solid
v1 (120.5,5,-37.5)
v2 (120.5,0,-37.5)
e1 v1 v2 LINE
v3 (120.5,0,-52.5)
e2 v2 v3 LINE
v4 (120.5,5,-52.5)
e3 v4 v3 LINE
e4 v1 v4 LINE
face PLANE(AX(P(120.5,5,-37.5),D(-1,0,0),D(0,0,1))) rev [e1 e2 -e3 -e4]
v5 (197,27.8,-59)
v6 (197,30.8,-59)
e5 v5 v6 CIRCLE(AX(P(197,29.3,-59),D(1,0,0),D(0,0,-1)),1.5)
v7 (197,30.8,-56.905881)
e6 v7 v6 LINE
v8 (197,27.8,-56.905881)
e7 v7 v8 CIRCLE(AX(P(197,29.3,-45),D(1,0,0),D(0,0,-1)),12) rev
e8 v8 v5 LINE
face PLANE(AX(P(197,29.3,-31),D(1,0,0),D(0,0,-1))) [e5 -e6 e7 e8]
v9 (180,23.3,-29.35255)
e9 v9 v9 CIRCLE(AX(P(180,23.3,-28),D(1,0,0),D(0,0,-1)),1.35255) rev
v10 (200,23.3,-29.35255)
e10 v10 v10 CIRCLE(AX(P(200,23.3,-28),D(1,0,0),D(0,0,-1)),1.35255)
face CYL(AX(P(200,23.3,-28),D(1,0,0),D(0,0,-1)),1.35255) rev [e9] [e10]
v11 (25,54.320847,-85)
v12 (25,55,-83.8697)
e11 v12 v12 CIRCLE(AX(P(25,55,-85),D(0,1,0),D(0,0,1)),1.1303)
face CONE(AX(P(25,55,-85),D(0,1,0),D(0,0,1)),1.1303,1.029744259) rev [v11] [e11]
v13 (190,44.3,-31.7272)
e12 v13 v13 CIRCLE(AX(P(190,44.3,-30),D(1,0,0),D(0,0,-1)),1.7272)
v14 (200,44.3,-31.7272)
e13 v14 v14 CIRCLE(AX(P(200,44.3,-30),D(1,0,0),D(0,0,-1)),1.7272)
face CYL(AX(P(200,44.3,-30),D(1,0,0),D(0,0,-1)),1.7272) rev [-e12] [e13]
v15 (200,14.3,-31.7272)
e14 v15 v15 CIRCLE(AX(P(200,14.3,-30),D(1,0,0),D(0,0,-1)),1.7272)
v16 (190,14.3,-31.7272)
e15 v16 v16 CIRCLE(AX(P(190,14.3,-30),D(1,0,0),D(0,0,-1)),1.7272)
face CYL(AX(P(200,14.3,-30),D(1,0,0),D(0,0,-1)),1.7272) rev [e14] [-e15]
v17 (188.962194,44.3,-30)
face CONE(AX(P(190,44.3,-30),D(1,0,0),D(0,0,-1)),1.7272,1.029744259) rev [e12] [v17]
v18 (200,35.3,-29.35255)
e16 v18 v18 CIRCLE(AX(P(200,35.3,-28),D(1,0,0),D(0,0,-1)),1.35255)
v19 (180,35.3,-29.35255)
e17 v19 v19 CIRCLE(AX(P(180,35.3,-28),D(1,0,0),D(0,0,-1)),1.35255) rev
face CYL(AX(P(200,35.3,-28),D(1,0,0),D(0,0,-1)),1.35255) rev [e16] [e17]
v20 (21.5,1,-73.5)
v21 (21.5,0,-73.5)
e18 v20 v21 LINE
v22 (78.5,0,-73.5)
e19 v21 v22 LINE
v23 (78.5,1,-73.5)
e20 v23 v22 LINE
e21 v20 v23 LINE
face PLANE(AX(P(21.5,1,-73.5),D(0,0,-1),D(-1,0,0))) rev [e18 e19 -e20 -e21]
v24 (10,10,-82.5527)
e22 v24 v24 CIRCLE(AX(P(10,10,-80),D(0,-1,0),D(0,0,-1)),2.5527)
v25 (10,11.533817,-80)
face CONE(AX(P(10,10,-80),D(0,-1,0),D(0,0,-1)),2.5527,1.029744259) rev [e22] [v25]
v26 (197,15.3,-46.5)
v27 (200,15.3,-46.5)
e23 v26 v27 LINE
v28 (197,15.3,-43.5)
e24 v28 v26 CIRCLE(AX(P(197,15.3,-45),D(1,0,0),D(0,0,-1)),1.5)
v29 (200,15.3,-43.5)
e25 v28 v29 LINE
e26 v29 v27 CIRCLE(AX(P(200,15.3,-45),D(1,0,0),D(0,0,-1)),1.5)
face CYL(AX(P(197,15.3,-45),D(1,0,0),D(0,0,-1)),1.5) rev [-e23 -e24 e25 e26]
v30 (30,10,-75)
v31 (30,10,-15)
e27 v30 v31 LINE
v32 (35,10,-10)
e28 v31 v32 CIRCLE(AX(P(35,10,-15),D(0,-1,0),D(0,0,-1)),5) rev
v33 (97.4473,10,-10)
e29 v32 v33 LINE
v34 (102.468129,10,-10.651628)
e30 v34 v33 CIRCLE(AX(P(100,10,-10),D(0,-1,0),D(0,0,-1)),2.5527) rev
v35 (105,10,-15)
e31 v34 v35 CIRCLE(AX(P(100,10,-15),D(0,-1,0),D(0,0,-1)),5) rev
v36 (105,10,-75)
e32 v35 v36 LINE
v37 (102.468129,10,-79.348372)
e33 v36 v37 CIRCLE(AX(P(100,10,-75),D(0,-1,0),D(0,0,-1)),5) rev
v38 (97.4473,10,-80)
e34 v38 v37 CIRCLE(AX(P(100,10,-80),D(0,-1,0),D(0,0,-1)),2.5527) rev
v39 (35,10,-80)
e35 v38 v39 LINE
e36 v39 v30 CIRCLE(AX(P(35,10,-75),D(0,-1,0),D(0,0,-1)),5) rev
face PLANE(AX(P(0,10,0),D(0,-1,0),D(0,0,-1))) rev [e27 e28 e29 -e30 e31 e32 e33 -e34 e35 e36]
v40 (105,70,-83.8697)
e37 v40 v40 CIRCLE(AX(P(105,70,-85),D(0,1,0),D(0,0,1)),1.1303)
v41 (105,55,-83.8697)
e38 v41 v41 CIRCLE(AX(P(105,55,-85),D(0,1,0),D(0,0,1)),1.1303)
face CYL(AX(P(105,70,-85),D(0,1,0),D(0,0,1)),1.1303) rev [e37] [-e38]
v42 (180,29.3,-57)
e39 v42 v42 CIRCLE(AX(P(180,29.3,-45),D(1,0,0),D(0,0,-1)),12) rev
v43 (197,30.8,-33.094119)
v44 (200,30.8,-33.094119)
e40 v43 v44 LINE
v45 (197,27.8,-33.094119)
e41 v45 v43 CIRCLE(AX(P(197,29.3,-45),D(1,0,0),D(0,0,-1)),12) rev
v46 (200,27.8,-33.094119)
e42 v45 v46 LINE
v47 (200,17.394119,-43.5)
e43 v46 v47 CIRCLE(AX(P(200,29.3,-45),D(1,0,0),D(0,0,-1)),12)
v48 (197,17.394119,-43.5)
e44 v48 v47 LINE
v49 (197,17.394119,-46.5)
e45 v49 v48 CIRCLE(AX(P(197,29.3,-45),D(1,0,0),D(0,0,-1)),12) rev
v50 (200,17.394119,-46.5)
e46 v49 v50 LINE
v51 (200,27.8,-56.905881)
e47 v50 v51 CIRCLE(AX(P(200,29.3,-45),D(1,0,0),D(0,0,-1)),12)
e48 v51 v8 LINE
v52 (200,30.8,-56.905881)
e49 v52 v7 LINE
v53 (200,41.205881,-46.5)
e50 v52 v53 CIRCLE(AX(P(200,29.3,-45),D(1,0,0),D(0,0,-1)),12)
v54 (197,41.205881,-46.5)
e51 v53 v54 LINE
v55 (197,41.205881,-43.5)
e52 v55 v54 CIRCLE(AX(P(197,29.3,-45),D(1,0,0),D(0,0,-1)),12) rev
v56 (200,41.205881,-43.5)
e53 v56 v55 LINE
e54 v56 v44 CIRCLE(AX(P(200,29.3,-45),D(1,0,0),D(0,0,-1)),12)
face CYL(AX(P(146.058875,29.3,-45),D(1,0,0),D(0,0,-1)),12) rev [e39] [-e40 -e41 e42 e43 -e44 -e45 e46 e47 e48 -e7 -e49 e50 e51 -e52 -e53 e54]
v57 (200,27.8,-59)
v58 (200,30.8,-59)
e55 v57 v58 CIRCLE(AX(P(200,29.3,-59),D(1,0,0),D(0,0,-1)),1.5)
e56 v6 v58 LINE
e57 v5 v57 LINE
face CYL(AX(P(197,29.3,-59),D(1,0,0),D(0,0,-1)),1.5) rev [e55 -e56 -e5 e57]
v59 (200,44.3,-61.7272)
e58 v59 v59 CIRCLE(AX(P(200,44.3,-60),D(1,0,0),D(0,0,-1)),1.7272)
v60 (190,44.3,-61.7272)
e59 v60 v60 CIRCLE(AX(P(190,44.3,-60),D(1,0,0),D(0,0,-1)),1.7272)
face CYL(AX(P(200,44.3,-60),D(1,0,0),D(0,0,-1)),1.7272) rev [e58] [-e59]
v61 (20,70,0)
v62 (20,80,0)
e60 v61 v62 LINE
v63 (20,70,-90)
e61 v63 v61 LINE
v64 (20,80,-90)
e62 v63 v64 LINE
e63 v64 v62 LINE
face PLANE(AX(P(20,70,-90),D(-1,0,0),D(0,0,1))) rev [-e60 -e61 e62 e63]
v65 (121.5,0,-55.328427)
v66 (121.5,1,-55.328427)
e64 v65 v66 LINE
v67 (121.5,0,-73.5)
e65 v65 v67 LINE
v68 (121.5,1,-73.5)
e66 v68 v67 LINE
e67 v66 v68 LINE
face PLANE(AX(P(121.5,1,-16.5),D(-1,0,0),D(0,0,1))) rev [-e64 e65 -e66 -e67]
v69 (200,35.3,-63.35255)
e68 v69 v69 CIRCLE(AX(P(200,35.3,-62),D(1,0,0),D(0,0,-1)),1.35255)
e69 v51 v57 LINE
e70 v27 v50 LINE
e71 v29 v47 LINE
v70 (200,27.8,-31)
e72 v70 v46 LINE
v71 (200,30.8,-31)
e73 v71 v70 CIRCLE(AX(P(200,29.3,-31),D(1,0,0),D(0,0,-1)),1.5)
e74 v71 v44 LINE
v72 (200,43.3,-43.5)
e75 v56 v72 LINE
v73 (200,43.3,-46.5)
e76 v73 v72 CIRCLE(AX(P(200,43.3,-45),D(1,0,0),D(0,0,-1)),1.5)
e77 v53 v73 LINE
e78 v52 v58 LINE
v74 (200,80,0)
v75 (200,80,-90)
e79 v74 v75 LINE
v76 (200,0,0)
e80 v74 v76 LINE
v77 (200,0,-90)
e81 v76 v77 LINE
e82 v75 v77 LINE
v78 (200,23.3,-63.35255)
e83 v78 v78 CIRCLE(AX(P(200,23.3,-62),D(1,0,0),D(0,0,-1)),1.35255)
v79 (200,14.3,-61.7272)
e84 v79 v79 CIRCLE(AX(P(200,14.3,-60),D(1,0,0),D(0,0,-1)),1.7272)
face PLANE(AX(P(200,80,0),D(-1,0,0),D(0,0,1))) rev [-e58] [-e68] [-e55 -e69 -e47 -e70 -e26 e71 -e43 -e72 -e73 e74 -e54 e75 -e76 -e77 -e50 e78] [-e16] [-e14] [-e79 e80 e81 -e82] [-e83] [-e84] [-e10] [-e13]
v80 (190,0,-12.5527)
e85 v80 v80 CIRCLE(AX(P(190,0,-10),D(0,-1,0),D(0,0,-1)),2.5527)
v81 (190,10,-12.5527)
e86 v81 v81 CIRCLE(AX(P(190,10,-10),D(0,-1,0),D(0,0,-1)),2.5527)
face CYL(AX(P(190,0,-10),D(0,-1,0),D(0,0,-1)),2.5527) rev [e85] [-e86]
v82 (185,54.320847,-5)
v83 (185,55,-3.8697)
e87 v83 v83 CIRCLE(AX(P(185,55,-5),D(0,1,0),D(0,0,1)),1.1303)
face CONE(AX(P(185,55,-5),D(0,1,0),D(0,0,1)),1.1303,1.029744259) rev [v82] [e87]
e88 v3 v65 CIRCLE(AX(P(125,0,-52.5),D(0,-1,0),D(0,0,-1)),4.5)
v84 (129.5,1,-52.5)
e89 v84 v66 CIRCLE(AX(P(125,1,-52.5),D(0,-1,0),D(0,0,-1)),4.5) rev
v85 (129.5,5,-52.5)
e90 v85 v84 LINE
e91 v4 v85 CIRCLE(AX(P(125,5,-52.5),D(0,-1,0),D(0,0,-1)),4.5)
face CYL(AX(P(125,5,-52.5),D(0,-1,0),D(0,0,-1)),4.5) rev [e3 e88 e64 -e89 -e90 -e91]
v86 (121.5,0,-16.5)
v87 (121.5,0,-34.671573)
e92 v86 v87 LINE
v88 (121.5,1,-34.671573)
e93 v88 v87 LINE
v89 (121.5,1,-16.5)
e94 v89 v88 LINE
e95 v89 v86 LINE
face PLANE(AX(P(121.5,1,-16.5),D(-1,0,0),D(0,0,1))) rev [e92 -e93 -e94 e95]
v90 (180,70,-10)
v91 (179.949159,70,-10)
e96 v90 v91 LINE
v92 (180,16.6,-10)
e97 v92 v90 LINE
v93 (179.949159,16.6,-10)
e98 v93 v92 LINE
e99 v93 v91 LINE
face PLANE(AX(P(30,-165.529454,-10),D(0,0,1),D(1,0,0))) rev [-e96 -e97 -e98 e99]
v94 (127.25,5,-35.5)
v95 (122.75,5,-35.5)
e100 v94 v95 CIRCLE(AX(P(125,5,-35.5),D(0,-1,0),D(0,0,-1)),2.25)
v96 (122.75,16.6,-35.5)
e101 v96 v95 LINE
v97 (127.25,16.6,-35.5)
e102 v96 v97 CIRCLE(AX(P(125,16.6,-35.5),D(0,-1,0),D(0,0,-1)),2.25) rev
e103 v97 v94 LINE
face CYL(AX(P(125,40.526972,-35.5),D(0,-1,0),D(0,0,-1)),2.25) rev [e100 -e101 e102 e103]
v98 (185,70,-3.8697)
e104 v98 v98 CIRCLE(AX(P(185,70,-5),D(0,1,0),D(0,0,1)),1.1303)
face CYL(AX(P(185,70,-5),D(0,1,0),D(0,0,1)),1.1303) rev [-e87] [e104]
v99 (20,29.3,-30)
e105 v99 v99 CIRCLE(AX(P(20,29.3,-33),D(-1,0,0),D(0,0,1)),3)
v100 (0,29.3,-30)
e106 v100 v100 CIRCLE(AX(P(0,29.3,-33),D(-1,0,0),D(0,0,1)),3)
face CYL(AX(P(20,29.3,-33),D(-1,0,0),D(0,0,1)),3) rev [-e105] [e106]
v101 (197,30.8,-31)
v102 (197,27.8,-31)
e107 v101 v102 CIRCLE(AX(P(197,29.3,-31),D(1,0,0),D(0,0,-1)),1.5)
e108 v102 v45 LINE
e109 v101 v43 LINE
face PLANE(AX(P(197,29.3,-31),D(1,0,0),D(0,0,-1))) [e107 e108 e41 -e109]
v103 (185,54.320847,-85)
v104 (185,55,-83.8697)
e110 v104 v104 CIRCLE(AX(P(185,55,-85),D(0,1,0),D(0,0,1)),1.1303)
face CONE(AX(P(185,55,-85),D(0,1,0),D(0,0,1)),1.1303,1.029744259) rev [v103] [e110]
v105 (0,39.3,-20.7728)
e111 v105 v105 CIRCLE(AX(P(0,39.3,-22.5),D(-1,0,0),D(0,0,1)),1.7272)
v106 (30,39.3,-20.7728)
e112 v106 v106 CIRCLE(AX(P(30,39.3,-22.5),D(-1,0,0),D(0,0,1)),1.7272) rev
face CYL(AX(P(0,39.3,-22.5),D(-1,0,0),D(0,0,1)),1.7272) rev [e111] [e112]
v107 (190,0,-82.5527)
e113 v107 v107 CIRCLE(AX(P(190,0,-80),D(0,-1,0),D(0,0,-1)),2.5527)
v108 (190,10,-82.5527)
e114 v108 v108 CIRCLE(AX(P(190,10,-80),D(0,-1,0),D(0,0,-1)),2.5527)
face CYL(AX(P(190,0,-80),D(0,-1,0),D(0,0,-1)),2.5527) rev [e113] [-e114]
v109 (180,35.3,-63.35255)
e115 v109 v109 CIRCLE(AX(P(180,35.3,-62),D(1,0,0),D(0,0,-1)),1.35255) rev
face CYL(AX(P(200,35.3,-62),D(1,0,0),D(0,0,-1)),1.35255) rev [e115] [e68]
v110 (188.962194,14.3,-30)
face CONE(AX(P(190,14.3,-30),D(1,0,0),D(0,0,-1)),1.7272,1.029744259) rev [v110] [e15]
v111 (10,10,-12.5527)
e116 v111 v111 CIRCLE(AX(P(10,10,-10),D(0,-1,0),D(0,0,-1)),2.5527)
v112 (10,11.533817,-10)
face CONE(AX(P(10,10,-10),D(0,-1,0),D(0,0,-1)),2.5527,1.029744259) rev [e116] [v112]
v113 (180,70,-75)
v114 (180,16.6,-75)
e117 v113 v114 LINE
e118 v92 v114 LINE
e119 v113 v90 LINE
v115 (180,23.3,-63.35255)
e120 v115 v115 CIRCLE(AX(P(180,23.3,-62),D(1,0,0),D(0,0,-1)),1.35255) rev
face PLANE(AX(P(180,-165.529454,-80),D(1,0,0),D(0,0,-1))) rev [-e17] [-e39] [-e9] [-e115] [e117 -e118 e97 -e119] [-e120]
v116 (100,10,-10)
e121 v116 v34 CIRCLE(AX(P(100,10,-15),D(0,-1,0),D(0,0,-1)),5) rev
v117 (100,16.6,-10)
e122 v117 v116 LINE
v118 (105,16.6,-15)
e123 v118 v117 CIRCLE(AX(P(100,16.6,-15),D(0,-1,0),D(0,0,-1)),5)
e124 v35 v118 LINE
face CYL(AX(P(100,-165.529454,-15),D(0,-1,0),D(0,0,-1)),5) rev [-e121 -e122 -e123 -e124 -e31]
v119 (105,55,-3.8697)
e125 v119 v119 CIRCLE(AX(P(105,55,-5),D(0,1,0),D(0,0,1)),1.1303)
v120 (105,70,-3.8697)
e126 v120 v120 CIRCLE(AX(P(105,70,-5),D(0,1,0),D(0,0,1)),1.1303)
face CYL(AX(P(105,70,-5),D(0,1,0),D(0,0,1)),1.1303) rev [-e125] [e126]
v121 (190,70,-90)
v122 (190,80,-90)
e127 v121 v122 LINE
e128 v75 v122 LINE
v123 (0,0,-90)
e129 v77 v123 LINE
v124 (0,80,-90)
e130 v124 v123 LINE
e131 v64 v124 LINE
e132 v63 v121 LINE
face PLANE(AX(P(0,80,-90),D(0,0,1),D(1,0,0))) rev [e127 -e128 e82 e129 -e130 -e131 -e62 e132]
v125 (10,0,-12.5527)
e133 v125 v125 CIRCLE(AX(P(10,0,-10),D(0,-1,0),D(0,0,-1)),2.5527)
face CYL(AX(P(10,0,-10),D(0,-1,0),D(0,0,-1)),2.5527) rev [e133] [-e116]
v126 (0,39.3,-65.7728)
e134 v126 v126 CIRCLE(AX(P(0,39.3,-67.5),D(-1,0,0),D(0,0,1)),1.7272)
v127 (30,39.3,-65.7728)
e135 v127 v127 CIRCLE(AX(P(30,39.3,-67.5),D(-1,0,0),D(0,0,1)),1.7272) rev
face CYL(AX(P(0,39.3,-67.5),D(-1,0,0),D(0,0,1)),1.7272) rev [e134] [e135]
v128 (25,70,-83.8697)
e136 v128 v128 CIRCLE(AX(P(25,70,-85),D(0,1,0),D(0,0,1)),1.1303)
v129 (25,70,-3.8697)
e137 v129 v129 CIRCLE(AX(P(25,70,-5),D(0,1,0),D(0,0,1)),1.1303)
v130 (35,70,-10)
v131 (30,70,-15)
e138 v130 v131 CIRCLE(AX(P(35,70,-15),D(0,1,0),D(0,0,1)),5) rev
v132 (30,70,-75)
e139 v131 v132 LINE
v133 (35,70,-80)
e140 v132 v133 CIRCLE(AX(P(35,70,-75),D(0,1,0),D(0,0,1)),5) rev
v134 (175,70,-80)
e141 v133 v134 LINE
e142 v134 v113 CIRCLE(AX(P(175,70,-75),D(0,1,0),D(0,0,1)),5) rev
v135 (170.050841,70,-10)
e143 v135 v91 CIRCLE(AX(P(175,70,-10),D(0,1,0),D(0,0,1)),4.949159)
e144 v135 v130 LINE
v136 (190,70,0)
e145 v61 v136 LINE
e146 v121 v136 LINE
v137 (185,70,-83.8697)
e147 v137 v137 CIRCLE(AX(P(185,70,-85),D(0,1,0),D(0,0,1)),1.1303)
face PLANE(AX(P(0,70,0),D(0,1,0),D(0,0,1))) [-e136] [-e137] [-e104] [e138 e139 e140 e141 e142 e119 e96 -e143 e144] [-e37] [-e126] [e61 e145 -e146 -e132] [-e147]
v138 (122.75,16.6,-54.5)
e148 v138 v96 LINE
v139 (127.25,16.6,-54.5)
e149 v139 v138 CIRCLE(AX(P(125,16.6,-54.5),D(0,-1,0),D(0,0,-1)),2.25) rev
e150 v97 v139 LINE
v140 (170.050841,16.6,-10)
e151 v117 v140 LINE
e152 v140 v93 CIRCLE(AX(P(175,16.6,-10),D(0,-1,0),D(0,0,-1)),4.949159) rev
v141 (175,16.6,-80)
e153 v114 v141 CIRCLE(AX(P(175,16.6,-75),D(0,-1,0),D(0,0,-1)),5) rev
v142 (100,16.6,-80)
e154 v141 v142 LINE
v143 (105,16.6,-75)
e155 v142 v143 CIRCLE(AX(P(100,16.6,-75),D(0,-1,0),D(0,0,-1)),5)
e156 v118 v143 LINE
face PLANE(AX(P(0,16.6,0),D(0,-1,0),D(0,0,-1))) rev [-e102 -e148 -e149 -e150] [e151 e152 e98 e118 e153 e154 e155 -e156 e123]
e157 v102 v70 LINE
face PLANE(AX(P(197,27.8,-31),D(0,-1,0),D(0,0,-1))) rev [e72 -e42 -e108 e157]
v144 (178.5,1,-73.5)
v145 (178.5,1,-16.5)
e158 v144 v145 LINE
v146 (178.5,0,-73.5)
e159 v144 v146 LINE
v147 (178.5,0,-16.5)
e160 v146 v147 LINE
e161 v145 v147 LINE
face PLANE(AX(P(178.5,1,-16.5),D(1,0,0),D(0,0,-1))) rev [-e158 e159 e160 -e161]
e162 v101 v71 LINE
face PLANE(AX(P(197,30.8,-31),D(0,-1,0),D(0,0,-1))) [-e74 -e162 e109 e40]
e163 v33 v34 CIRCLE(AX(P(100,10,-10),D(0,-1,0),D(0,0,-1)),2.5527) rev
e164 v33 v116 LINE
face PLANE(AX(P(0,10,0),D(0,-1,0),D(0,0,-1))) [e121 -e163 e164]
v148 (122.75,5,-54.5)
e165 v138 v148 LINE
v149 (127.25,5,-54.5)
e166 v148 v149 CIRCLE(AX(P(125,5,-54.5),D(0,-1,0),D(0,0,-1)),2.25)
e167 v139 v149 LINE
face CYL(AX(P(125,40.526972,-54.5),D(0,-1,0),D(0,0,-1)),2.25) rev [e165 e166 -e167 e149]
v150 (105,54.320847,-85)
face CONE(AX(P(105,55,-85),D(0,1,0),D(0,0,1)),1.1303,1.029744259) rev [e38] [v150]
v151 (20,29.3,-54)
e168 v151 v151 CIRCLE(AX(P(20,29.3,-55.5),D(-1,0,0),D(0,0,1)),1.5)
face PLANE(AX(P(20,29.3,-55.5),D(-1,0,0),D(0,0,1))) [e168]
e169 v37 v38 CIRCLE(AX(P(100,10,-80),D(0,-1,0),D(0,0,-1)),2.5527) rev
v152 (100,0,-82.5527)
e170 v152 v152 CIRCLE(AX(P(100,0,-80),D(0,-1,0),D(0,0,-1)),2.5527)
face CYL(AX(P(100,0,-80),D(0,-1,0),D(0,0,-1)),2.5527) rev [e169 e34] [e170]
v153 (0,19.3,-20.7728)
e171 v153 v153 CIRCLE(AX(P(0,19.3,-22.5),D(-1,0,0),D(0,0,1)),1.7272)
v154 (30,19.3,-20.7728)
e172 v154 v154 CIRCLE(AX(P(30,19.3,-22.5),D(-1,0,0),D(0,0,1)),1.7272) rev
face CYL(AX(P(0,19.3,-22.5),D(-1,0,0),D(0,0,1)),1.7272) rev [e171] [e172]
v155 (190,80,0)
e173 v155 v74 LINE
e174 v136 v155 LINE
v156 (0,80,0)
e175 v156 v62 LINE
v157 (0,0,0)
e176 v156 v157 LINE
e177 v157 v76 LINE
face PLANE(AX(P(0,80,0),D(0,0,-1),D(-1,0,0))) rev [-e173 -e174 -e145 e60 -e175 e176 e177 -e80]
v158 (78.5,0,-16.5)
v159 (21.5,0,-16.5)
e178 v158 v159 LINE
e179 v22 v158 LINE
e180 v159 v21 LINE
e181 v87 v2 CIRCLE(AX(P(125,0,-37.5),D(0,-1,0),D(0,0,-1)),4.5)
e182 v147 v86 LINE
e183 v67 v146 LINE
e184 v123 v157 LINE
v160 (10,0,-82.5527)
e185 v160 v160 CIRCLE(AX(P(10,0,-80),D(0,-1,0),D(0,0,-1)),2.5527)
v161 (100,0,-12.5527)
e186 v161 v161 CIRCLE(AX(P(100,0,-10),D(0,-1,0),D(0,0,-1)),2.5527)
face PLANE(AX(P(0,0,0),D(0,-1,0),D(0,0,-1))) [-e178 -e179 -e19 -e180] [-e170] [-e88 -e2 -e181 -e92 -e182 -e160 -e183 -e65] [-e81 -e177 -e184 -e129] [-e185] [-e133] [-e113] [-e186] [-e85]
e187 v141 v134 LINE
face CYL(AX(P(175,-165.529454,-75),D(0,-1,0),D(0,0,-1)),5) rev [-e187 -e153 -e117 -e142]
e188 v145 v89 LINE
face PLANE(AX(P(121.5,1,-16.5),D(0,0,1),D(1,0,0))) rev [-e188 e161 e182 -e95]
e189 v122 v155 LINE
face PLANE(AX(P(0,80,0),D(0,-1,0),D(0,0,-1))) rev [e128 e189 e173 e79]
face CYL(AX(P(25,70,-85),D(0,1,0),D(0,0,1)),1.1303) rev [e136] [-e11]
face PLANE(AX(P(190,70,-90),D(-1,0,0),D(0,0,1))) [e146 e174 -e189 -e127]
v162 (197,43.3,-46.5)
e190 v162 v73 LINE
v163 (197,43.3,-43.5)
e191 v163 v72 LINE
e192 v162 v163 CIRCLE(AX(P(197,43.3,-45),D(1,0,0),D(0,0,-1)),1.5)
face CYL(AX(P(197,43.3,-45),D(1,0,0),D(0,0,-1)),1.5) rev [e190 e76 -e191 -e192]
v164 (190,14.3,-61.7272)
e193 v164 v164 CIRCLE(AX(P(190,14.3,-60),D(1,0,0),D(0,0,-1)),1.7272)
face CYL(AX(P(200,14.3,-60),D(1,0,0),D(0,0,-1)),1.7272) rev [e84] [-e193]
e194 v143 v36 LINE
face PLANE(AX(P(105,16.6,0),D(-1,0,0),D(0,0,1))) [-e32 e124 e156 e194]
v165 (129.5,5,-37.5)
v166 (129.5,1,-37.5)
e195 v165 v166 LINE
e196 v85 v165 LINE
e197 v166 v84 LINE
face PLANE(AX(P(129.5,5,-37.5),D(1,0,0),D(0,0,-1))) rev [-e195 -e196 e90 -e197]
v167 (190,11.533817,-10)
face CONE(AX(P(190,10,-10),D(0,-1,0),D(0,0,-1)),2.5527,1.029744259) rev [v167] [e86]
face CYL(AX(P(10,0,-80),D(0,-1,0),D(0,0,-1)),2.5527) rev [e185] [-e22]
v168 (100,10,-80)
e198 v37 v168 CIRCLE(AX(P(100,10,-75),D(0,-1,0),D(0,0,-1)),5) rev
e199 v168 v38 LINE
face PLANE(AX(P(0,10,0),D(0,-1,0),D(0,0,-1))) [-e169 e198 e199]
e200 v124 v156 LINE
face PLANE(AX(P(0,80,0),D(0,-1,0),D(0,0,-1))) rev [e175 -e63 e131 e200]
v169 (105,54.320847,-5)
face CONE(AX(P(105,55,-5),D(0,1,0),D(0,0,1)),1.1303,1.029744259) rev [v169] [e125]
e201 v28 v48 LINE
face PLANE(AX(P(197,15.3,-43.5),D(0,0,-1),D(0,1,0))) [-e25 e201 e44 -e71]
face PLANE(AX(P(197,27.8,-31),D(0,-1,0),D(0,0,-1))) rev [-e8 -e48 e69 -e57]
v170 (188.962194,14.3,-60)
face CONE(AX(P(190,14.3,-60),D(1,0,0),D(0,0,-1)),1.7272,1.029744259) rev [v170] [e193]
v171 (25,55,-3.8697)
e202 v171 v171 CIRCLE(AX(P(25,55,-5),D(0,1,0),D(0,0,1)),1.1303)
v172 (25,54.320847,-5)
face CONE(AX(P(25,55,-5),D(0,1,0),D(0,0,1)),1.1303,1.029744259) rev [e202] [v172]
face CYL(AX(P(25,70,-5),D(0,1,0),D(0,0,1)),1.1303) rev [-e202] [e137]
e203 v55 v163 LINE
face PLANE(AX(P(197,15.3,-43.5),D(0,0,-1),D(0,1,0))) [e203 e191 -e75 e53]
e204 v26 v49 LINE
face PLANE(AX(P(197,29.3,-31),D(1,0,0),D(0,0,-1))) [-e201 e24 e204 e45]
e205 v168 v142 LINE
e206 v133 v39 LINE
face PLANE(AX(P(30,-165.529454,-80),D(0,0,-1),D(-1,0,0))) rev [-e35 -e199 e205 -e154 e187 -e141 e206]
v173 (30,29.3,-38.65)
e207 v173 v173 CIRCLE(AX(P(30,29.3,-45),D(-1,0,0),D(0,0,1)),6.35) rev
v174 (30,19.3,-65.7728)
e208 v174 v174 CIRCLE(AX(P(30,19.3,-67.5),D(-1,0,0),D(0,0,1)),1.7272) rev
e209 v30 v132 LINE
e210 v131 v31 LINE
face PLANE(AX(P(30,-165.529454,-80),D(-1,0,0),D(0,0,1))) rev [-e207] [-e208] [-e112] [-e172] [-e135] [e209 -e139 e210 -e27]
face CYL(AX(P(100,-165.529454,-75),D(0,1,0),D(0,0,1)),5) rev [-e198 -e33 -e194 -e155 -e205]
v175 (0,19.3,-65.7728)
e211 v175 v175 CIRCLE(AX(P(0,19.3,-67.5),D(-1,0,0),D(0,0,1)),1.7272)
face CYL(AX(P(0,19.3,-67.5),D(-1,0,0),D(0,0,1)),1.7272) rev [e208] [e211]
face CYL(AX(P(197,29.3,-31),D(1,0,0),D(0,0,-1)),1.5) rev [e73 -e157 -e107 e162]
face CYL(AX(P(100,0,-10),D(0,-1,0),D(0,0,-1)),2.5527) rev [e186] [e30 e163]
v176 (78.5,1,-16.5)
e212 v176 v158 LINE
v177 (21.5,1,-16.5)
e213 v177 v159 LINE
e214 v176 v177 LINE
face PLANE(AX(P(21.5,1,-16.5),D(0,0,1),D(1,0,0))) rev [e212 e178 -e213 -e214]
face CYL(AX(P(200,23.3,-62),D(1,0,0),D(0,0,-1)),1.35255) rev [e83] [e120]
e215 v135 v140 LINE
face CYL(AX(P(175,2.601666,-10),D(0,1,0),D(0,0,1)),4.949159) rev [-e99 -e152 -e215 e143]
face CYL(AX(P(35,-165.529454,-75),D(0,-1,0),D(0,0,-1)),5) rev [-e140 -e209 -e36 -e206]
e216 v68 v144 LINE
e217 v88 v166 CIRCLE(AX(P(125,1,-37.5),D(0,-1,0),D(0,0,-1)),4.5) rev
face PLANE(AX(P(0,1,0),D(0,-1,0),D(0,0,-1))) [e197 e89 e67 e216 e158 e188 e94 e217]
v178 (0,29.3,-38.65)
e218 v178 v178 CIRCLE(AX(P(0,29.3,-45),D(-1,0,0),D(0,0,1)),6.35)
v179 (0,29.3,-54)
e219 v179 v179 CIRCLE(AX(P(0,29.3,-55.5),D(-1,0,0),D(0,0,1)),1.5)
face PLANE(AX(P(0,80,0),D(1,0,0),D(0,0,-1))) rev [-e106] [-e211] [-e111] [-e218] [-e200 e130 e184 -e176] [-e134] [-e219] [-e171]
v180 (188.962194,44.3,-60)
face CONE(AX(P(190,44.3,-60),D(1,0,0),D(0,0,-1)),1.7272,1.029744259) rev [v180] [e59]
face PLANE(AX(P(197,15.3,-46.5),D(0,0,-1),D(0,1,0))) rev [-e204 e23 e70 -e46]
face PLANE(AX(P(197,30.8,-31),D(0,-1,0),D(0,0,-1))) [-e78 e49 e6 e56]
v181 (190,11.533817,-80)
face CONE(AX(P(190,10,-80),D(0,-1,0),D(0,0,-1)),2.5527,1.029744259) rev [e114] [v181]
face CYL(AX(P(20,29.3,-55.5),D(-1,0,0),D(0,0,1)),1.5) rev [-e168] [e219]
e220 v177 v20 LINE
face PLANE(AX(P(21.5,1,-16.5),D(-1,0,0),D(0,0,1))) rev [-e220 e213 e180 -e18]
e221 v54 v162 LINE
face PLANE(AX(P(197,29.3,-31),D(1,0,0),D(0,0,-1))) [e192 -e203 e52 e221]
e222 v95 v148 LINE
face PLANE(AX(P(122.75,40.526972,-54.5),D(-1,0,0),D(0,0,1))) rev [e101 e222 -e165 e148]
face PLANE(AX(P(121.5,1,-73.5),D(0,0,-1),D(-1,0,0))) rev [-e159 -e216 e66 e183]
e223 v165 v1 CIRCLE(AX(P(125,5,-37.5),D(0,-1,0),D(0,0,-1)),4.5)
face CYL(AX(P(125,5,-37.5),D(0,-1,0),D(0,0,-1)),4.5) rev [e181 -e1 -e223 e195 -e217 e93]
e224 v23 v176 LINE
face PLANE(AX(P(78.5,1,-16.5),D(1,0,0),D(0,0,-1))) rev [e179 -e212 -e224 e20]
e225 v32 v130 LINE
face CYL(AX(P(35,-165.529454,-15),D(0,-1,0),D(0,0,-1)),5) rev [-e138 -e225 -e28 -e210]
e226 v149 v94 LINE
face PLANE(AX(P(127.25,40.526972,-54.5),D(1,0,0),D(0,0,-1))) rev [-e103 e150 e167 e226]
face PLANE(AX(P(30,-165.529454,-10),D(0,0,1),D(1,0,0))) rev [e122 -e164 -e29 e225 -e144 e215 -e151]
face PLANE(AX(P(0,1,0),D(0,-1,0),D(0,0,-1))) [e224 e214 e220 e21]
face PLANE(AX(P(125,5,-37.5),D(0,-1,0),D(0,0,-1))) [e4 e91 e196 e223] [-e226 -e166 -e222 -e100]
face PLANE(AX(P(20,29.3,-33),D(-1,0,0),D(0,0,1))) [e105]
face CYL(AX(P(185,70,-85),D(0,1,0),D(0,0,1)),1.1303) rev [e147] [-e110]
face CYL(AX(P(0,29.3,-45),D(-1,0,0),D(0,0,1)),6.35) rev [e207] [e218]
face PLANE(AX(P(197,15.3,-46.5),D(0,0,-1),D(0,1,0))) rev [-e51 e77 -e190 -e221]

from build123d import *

# Parameters (mm, degrees)
SKETCH5_W                                      = 200
SKETCH5_H                                      = 90
BOSS_EXTRUDE1_DEPTH                            = 80
SKETCH6_W                                      = 150
SKETCH6_H                                      = 70
CAVITYBED_DEPTH                                = 70
DIODEHOLDER_SM05_TAPPED_HOLE1_REACH            = 235.452
DIODEHOLDER_SM05_TAPPED_HOLE1_BORE_R           = 6.35
FILLET1_R                                      = 5
SKETCH33_W                                     = 170
SKETCH33_H                                     = 90
LIDGROOVE_DEPTH                                = 10
SKETCH35_W                                     = 85
SKETCH35_H                                     = 90
FILTERPLATFORM_DEPTH                           = 16.6
FILLET3_R                                      = 5
FILTERMOUNTGROOVE_DEPTH                        = 5
FILTERMOUNTCUT_DEPTH                           = 11.6
SKETCH42_R                                     = 12
OUTPUTHOLE_DEPTH                               = 20
SKETCH54_R                                     = 3
SKETCH54_R_2                                   = 1.5
THERMISTER_AD590_DIODE_DEPTH                   = 20
SKETCH61_W                                     = 57
SKETCH61_H                                     = 57
TEC_GROOVES_DEPTH                              = 1
LENSPLATEMOUNTINGHOLES_8_32_TAPPED_HOLE1_REACH = 235.452
LENSPLATEMOUNTINGHOLES_8_32_TAPPED_H_2_R       = 1.7272
PIEZOPLATE_MOUNTING_HOLES_6_32_TAPPED_HO_REACH = 235.452
PIEZOPLATE_MOUNTING_HOLES_6_32_TAPPE_2_R       = 1.35255
LENSPLATEOUTPUTMOUNTING_4_40_TAPPED_HOLE_D     = 3.4544
LENSPLATEOUTPUTMOUNTING_4_40_TAPPED_HOLE_DEPTH = 10
LENSPLATEOUTPUTMOUNTING_4_40_TAPPED_HOLE_TIP   = 1.037806461
COVERLIDTHREADS_D                              = 2.2606
COVERLIDTHREADS_DEPTH                          = 15
COVERLIDTHREADS_TIP                            = 0.679152758
BOTTOMMOUNTING_1_4_20_TAPPED_HOLE2_OUTLI_R     = 2.5527
BOTTOMMOUNTING_1_4_20_TAPPED_HOLE2_DEPTH       = 10
SKETCH67_R                                     = 4.949158555
CUT_EXTRUDE1_DEPTH                             = 53.4
CUT_EXTRUDE2_DEPTH                             = 3


# Read off the part's stored shape, not the designer's step: BottomMounting_1/4-20 Tapped Hole2
with BuildPart() as part:
    # Sketch5 → Boss-Extrude1 (new body)
    with BuildSketch(Plane(origin=(0, 0, 0), x_dir=(1, 0, 0), z_dir=(0, 1, 0))):
        with Locations((100, 45)):
            Rectangle(SKETCH5_W, SKETCH5_H)
    extrude(amount=BOSS_EXTRUDE1_DEPTH)

    # Sketch6 → CavityBed (cut)
    with BuildSketch(Plane(origin=(0, 80, 0), x_dir=(1, 0, 0), z_dir=(0, 1, 0))):
        with Locations((105, 45)):
            Rectangle(SKETCH6_W, SKETCH6_H)
    extrude(amount=-CAVITYBED_DEPTH, mode=Mode.SUBTRACT)

    # DiodeHolder_SM05_Tapped Hole1 bore → DiodeHolder_SM05_Tapped Hole1 (cut, up to next)
    with BuildSketch(Plane.ZY, mode=Mode.PRIVATE) as diodeholder_sm05_tapped_hole1_sk1:
        with Locations((-45, 29.3)):
            Circle(DIODEHOLDER_SM05_TAPPED_HOLE1_BORE_R)
    diodeholder_sm05_tapped_hole1_tool1 = extrude(diodeholder_sm05_tapped_hole1_sk1.sketch, amount=-DIODEHOLDER_SM05_TAPPED_HOLE1_REACH, mode=Mode.PRIVATE) & part.part
    add(diodeholder_sm05_tapped_hole1_tool1.solids().sort_by_distance((0, 29.3, -45))[0], mode=Mode.SUBTRACT)

    # Fillet1
    fillet1_edges = [part.edges().sort_by_distance(p)[0] for p in [
        (180, 45, -80),
        (30, 45, -80),
        (30, 45, -10),
    ]]
    fillet(fillet1_edges, radius=FILLET1_R)

    # Sketch33 → LidGroove (cut)
    with BuildSketch(Plane(origin=(0, 80, 0), x_dir=(1, 0, 0), z_dir=(0, 1, 0))):
        with Locations((105, 45)):
            Rectangle(SKETCH33_W, SKETCH33_H)
    extrude(amount=-LIDGROOVE_DEPTH, mode=Mode.SUBTRACT)

    # Sketch35 → FilterPlatform (add)
    with BuildSketch(Plane.XZ):
        with Locations((147.5, -45)):
            Rectangle(SKETCH35_W, SKETCH35_H)
    extrude(amount=-FILTERPLATFORM_DEPTH)

    # Fillet3
    fillet3_edges = [part.edges().sort_by_distance(p)[0] for p in [
        (105, 13.3, -10),
        (105, 13.3, -80),
    ]]
    fillet(fillet3_edges, radius=FILLET3_R)

    # Sketch36 → FilterMountGroove (cut)
    with BuildSketch(Plane.XZ):
        with BuildLine():
            Line((129.5, -37.5), (129.5, -52.5))
            ThreePointArc((129.5, -52.5), (125, -57), (120.5, -52.5))
            Line((120.5, -52.5), (120.5, -37.5))
            ThreePointArc((120.5, -37.5), (125, -33), (129.5, -37.5))
        make_face()
    extrude(amount=-FILTERMOUNTGROOVE_DEPTH, mode=Mode.SUBTRACT)

    # Sketch60 → FilterMountCut (cut)
    with BuildSketch(Plane.XZ.offset(-5)):
        with BuildLine():
            Line((122.75, -54.5), (122.75, -35.5))
            ThreePointArc((122.75, -35.5), (125, -33.25), (127.25, -35.5))
            Line((127.25, -35.5), (127.25, -54.5))
            ThreePointArc((127.25, -54.5), (125, -56.75), (122.75, -54.5))
        make_face()
    extrude(amount=-FILTERMOUNTCUT_DEPTH, mode=Mode.SUBTRACT)

    # Sketch42 → OutputHole (cut)
    with BuildSketch(Plane(origin=(200, 0, 0), x_dir=(0, 0, -1), z_dir=(1, 0, 0))):
        with Locations((45, 29.3)):
            Circle(SKETCH42_R)
    extrude(amount=-OUTPUTHOLE_DEPTH, mode=Mode.SUBTRACT)

    # Sketch54 → thermister_AD590_diode (cut)
    with BuildSketch(Plane.ZY):
        with Locations((-33, 29.3)):
            Circle(SKETCH54_R)
        with Locations((-55.5, 29.3)):
            Circle(SKETCH54_R_2)
    extrude(amount=-THERMISTER_AD590_DIODE_DEPTH, mode=Mode.SUBTRACT)

    # Sketch61 → TEC_grooves (cut)
    with BuildSketch(Plane.XZ):
        with Locations((50, -45)):
            Rectangle(SKETCH61_W, SKETCH61_H)
        with Locations((150, -45)):
            Rectangle(SKETCH61_W, SKETCH61_H)
    extrude(amount=-TEC_GROOVES_DEPTH, mode=Mode.SUBTRACT)

    # LensPlateMountingHoles_8-32 Tapped H 2 → LensPlateMountingHoles#8-32 Tapped Hole1 (cut, up to next)
    with BuildSketch(Plane.ZY, mode=Mode.PRIVATE) as lensplatemountingholes_8_32_tapped_hole1_sk1:
        with Locations((-67.5, 39.3)):
            Circle(LENSPLATEMOUNTINGHOLES_8_32_TAPPED_H_2_R)
    lensplatemountingholes_8_32_tapped_hole1_tool1 = extrude(lensplatemountingholes_8_32_tapped_hole1_sk1.sketch, amount=-LENSPLATEMOUNTINGHOLES_8_32_TAPPED_HOLE1_REACH, mode=Mode.PRIVATE) & part.part
    # LensPlateMountingHoles_8-32 Tapped H 2 → LensPlateMountingHoles#8-32 Tapped Hole1 (cut, up to next)
    with BuildSketch(Plane.ZY, mode=Mode.PRIVATE) as lensplatemountingholes_8_32_tapped_hole1_sk2:
        with Locations((-22.5, 39.3)):
            Circle(LENSPLATEMOUNTINGHOLES_8_32_TAPPED_H_2_R)
    lensplatemountingholes_8_32_tapped_hole1_tool2 = extrude(lensplatemountingholes_8_32_tapped_hole1_sk2.sketch, amount=-LENSPLATEMOUNTINGHOLES_8_32_TAPPED_HOLE1_REACH, mode=Mode.PRIVATE) & part.part
    # LensPlateMountingHoles_8-32 Tapped H 2 → LensPlateMountingHoles#8-32 Tapped Hole1 (cut, up to next)
    with BuildSketch(Plane.ZY, mode=Mode.PRIVATE) as lensplatemountingholes_8_32_tapped_hole1_sk3:
        with Locations((-22.5, 19.3)):
            Circle(LENSPLATEMOUNTINGHOLES_8_32_TAPPED_H_2_R)
    lensplatemountingholes_8_32_tapped_hole1_tool3 = extrude(lensplatemountingholes_8_32_tapped_hole1_sk3.sketch, amount=-LENSPLATEMOUNTINGHOLES_8_32_TAPPED_HOLE1_REACH, mode=Mode.PRIVATE) & part.part
    # LensPlateMountingHoles_8-32 Tapped H 2 → LensPlateMountingHoles#8-32 Tapped Hole1 (cut, up to next)
    with BuildSketch(Plane.ZY, mode=Mode.PRIVATE) as lensplatemountingholes_8_32_tapped_hole1_sk4:
        with Locations((-67.5, 19.3)):
            Circle(LENSPLATEMOUNTINGHOLES_8_32_TAPPED_H_2_R)
    lensplatemountingholes_8_32_tapped_hole1_tool4 = extrude(lensplatemountingholes_8_32_tapped_hole1_sk4.sketch, amount=-LENSPLATEMOUNTINGHOLES_8_32_TAPPED_HOLE1_REACH, mode=Mode.PRIVATE) & part.part
    add(lensplatemountingholes_8_32_tapped_hole1_tool1.solids().sort_by_distance((0, 39.3, -67.5))[0], mode=Mode.SUBTRACT)
    add(lensplatemountingholes_8_32_tapped_hole1_tool2.solids().sort_by_distance((0, 39.3, -22.5))[0], mode=Mode.SUBTRACT)
    add(lensplatemountingholes_8_32_tapped_hole1_tool3.solids().sort_by_distance((0, 19.3, -22.5))[0], mode=Mode.SUBTRACT)
    add(lensplatemountingholes_8_32_tapped_hole1_tool4.solids().sort_by_distance((0, 19.3, -67.5))[0], mode=Mode.SUBTRACT)

    # PiezoPlate_Mounting_holes_6-32 Tappe 2 → PiezoPlate_Mounting_holes#6-32 Tapped Hole2 (cut, up to next)
    with BuildSketch(Plane(origin=(200, 0, 0), x_dir=(0, 0, -1), z_dir=(1, 0, 0)), mode=Mode.PRIVATE) as piezoplate_mounting_holes_6_32_tapped_ho_sk1:
        with Locations((28, 35.3)):
            Circle(PIEZOPLATE_MOUNTING_HOLES_6_32_TAPPE_2_R)
    piezoplate_mounting_holes_6_32_tapped_ho_tool1 = extrude(piezoplate_mounting_holes_6_32_tapped_ho_sk1.sketch, amount=-PIEZOPLATE_MOUNTING_HOLES_6_32_TAPPED_HO_REACH, mode=Mode.PRIVATE) & part.part
    # PiezoPlate_Mounting_holes_6-32 Tappe 2 → PiezoPlate_Mounting_holes#6-32 Tapped Hole2 (cut, up to next)
    with BuildSketch(Plane(origin=(200, 0, 0), x_dir=(0, 0, -1), z_dir=(1, 0, 0)), mode=Mode.PRIVATE) as piezoplate_mounting_holes_6_32_tapped_ho_sk2:
        with Locations((62, 35.3)):
            Circle(PIEZOPLATE_MOUNTING_HOLES_6_32_TAPPE_2_R)
    piezoplate_mounting_holes_6_32_tapped_ho_tool2 = extrude(piezoplate_mounting_holes_6_32_tapped_ho_sk2.sketch, amount=-PIEZOPLATE_MOUNTING_HOLES_6_32_TAPPED_HO_REACH, mode=Mode.PRIVATE) & part.part
    # PiezoPlate_Mounting_holes_6-32 Tappe 2 → PiezoPlate_Mounting_holes#6-32 Tapped Hole2 (cut, up to next)
    with BuildSketch(Plane(origin=(200, 0, 0), x_dir=(0, 0, -1), z_dir=(1, 0, 0)), mode=Mode.PRIVATE) as piezoplate_mounting_holes_6_32_tapped_ho_sk3:
        with Locations((62, 23.3)):
            Circle(PIEZOPLATE_MOUNTING_HOLES_6_32_TAPPE_2_R)
    piezoplate_mounting_holes_6_32_tapped_ho_tool3 = extrude(piezoplate_mounting_holes_6_32_tapped_ho_sk3.sketch, amount=-PIEZOPLATE_MOUNTING_HOLES_6_32_TAPPED_HO_REACH, mode=Mode.PRIVATE) & part.part
    # PiezoPlate_Mounting_holes_6-32 Tappe 2 → PiezoPlate_Mounting_holes#6-32 Tapped Hole2 (cut, up to next)
    with BuildSketch(Plane(origin=(200, 0, 0), x_dir=(0, 0, -1), z_dir=(1, 0, 0)), mode=Mode.PRIVATE) as piezoplate_mounting_holes_6_32_tapped_ho_sk4:
        with Locations((28, 23.3)):
            Circle(PIEZOPLATE_MOUNTING_HOLES_6_32_TAPPE_2_R)
    piezoplate_mounting_holes_6_32_tapped_ho_tool4 = extrude(piezoplate_mounting_holes_6_32_tapped_ho_sk4.sketch, amount=-PIEZOPLATE_MOUNTING_HOLES_6_32_TAPPED_HO_REACH, mode=Mode.PRIVATE) & part.part
    add(piezoplate_mounting_holes_6_32_tapped_ho_tool1.solids().sort_by_distance((200, 35.3, -28))[0], mode=Mode.SUBTRACT)
    add(piezoplate_mounting_holes_6_32_tapped_ho_tool2.solids().sort_by_distance((200, 35.3, -62))[0], mode=Mode.SUBTRACT)
    add(piezoplate_mounting_holes_6_32_tapped_ho_tool3.solids().sort_by_distance((200, 23.3, -62))[0], mode=Mode.SUBTRACT)
    add(piezoplate_mounting_holes_6_32_tapped_ho_tool4.solids().sort_by_distance((200, 23.3, -28))[0], mode=Mode.SUBTRACT)

    # LensPlateOutputMounting#4-40 Tapped Hole3
    with Locations(Plane(origin=(200, 0, 0), x_dir=(0, 0, -1), z_dir=(1, 0, 0))):
        with Locations((30, 44.3), (60, 44.3), (60, 14.3), (30, 14.3)):
            Hole(LENSPLATEOUTPUTMOUNTING_4_40_TAPPED_HOLE_D / 2, depth=LENSPLATEOUTPUTMOUNTING_4_40_TAPPED_HOLE_DEPTH)
            with Locations((0, 0, -(LENSPLATEOUTPUTMOUNTING_4_40_TAPPED_HOLE_DEPTH + LENSPLATEOUTPUTMOUNTING_4_40_TAPPED_HOLE_TIP / 2))):  # 118° drill point
                Cone(0, LENSPLATEOUTPUTMOUNTING_4_40_TAPPED_HOLE_D / 2, LENSPLATEOUTPUTMOUNTING_4_40_TAPPED_HOLE_TIP, mode=Mode.SUBTRACT)

    # CoverLidThreads
    with Locations(Plane(origin=(0, 70, 0), x_dir=(1, 0, 0), z_dir=(0, 1, 0))):
        with Locations((25, 85), (185, 85), (185, 5), (25, 5), (105, 5), (105, 85)):
            Hole(COVERLIDTHREADS_D / 2, depth=COVERLIDTHREADS_DEPTH)
            with Locations((0, 0, -(COVERLIDTHREADS_DEPTH + COVERLIDTHREADS_TIP / 2))):  # 118° drill point
                Cone(0, COVERLIDTHREADS_D / 2, COVERLIDTHREADS_TIP, mode=Mode.SUBTRACT)

    # BottomMounting_1/4-20 Tapped Hole2 outli → BottomMounting_1/4-20 Tapped Hole2 (cut)
    with BuildSketch(Plane(origin=(0, 0, 0), x_dir=(1, 0, 0), z_dir=(0, 1, 0))):
        with Locations((100, 80)):
            Circle(BOTTOMMOUNTING_1_4_20_TAPPED_HOLE2_OUTLI_R)
        with Locations((100, 10)):
            Circle(BOTTOMMOUNTING_1_4_20_TAPPED_HOLE2_OUTLI_R)
    extrude(amount=BOTTOMMOUNTING_1_4_20_TAPPED_HOLE2_DEPTH, mode=Mode.SUBTRACT)

    # BottomMounting_1_4-20 Tapped Hole2 2 out → BottomMounting_1_4-20 Tapped Hole2 2 (revolve, cut)
    with BuildSketch(Plane(origin=(10, 0, -80), x_dir=(1, 0, 0), z_dir=(0, 0, 1))):
        Polygon((2.5527, 10), (0, 11.533816902), (0, 0), (2.5527, 0), align=None)
    revolve(axis=Axis((10, 0, -80), (0, 1, 0)), mode=Mode.SUBTRACT)

    # BottomMounting_1_4-20 Tapped Hole2 3 out → BottomMounting_1_4-20 Tapped Hole2 3 (revolve, cut)
    with BuildSketch(Plane(origin=(10, 0, -10), x_dir=(1, 0, 0), z_dir=(0, 0, 1))):
        Polygon((2.5527, 10), (0, 11.533816902), (0, 0), (2.5527, 0), align=None)
    revolve(axis=Axis((10, 0, -10), (0, 1, 0)), mode=Mode.SUBTRACT)

    # BottomMounting_1_4-20 Tapped Hole2 4 out → BottomMounting_1_4-20 Tapped Hole2 4 (revolve, cut)
    with BuildSketch(Plane(origin=(190, 0, -10), x_dir=(1, 0, 0), z_dir=(0, 0, 1))):
        Polygon((2.5527, 10), (0, 11.533816902), (0, 0), (2.5527, 0), align=None)
    revolve(axis=Axis((190, 0, -10), (0, 1, 0)), mode=Mode.SUBTRACT)

    # BottomMounting_1_4-20 Tapped Hole2 5 out → BottomMounting_1_4-20 Tapped Hole2 5 (revolve, cut)
    with BuildSketch(Plane(origin=(190, 0, -80), x_dir=(1, 0, 0), z_dir=(0, 0, 1))):
        Polygon((2.5527, 10), (0, 11.533816902), (0, 0), (2.5527, 0), align=None)
    revolve(axis=Axis((190, 0, -80), (0, 1, 0)), mode=Mode.SUBTRACT)

    # Sketch67 → Cut-Extrude1 (cut)
    with BuildSketch(Plane(origin=(0, 70, 0), x_dir=(1, 0, 0), z_dir=(0, 1, 0))):
        with Locations((175, 10)):
            Circle(SKETCH67_R)
    extrude(amount=-CUT_EXTRUDE1_DEPTH, mode=Mode.SUBTRACT)

    # Sketch69 → Cut-Extrude2 (cut)
    with BuildSketch(Plane(origin=(200, 0, 0), x_dir=(0, 0, -1), z_dir=(1, 0, 0))):
        with BuildLine():
            Line((43.5, 15.3), (43.5, 43.3))
            ThreePointArc((43.5, 43.3), (45, 44.8), (46.5, 43.3))
            Line((46.5, 43.3), (46.5, 15.3))
            ThreePointArc((46.5, 15.3), (45, 13.8), (43.5, 15.3))
        make_face()
        with BuildLine():
            Line((31, 30.8), (59, 30.8))
            ThreePointArc((59, 30.8), (60.5, 29.3), (59, 27.8))
            Line((59, 27.8), (31, 27.8))
            ThreePointArc((31, 27.8), (29.5, 29.3), (31, 30.8))
        make_face()
    extrude(amount=-CUT_EXTRUDE2_DEPTH, mode=Mode.SUBTRACT)


solid = part.part
